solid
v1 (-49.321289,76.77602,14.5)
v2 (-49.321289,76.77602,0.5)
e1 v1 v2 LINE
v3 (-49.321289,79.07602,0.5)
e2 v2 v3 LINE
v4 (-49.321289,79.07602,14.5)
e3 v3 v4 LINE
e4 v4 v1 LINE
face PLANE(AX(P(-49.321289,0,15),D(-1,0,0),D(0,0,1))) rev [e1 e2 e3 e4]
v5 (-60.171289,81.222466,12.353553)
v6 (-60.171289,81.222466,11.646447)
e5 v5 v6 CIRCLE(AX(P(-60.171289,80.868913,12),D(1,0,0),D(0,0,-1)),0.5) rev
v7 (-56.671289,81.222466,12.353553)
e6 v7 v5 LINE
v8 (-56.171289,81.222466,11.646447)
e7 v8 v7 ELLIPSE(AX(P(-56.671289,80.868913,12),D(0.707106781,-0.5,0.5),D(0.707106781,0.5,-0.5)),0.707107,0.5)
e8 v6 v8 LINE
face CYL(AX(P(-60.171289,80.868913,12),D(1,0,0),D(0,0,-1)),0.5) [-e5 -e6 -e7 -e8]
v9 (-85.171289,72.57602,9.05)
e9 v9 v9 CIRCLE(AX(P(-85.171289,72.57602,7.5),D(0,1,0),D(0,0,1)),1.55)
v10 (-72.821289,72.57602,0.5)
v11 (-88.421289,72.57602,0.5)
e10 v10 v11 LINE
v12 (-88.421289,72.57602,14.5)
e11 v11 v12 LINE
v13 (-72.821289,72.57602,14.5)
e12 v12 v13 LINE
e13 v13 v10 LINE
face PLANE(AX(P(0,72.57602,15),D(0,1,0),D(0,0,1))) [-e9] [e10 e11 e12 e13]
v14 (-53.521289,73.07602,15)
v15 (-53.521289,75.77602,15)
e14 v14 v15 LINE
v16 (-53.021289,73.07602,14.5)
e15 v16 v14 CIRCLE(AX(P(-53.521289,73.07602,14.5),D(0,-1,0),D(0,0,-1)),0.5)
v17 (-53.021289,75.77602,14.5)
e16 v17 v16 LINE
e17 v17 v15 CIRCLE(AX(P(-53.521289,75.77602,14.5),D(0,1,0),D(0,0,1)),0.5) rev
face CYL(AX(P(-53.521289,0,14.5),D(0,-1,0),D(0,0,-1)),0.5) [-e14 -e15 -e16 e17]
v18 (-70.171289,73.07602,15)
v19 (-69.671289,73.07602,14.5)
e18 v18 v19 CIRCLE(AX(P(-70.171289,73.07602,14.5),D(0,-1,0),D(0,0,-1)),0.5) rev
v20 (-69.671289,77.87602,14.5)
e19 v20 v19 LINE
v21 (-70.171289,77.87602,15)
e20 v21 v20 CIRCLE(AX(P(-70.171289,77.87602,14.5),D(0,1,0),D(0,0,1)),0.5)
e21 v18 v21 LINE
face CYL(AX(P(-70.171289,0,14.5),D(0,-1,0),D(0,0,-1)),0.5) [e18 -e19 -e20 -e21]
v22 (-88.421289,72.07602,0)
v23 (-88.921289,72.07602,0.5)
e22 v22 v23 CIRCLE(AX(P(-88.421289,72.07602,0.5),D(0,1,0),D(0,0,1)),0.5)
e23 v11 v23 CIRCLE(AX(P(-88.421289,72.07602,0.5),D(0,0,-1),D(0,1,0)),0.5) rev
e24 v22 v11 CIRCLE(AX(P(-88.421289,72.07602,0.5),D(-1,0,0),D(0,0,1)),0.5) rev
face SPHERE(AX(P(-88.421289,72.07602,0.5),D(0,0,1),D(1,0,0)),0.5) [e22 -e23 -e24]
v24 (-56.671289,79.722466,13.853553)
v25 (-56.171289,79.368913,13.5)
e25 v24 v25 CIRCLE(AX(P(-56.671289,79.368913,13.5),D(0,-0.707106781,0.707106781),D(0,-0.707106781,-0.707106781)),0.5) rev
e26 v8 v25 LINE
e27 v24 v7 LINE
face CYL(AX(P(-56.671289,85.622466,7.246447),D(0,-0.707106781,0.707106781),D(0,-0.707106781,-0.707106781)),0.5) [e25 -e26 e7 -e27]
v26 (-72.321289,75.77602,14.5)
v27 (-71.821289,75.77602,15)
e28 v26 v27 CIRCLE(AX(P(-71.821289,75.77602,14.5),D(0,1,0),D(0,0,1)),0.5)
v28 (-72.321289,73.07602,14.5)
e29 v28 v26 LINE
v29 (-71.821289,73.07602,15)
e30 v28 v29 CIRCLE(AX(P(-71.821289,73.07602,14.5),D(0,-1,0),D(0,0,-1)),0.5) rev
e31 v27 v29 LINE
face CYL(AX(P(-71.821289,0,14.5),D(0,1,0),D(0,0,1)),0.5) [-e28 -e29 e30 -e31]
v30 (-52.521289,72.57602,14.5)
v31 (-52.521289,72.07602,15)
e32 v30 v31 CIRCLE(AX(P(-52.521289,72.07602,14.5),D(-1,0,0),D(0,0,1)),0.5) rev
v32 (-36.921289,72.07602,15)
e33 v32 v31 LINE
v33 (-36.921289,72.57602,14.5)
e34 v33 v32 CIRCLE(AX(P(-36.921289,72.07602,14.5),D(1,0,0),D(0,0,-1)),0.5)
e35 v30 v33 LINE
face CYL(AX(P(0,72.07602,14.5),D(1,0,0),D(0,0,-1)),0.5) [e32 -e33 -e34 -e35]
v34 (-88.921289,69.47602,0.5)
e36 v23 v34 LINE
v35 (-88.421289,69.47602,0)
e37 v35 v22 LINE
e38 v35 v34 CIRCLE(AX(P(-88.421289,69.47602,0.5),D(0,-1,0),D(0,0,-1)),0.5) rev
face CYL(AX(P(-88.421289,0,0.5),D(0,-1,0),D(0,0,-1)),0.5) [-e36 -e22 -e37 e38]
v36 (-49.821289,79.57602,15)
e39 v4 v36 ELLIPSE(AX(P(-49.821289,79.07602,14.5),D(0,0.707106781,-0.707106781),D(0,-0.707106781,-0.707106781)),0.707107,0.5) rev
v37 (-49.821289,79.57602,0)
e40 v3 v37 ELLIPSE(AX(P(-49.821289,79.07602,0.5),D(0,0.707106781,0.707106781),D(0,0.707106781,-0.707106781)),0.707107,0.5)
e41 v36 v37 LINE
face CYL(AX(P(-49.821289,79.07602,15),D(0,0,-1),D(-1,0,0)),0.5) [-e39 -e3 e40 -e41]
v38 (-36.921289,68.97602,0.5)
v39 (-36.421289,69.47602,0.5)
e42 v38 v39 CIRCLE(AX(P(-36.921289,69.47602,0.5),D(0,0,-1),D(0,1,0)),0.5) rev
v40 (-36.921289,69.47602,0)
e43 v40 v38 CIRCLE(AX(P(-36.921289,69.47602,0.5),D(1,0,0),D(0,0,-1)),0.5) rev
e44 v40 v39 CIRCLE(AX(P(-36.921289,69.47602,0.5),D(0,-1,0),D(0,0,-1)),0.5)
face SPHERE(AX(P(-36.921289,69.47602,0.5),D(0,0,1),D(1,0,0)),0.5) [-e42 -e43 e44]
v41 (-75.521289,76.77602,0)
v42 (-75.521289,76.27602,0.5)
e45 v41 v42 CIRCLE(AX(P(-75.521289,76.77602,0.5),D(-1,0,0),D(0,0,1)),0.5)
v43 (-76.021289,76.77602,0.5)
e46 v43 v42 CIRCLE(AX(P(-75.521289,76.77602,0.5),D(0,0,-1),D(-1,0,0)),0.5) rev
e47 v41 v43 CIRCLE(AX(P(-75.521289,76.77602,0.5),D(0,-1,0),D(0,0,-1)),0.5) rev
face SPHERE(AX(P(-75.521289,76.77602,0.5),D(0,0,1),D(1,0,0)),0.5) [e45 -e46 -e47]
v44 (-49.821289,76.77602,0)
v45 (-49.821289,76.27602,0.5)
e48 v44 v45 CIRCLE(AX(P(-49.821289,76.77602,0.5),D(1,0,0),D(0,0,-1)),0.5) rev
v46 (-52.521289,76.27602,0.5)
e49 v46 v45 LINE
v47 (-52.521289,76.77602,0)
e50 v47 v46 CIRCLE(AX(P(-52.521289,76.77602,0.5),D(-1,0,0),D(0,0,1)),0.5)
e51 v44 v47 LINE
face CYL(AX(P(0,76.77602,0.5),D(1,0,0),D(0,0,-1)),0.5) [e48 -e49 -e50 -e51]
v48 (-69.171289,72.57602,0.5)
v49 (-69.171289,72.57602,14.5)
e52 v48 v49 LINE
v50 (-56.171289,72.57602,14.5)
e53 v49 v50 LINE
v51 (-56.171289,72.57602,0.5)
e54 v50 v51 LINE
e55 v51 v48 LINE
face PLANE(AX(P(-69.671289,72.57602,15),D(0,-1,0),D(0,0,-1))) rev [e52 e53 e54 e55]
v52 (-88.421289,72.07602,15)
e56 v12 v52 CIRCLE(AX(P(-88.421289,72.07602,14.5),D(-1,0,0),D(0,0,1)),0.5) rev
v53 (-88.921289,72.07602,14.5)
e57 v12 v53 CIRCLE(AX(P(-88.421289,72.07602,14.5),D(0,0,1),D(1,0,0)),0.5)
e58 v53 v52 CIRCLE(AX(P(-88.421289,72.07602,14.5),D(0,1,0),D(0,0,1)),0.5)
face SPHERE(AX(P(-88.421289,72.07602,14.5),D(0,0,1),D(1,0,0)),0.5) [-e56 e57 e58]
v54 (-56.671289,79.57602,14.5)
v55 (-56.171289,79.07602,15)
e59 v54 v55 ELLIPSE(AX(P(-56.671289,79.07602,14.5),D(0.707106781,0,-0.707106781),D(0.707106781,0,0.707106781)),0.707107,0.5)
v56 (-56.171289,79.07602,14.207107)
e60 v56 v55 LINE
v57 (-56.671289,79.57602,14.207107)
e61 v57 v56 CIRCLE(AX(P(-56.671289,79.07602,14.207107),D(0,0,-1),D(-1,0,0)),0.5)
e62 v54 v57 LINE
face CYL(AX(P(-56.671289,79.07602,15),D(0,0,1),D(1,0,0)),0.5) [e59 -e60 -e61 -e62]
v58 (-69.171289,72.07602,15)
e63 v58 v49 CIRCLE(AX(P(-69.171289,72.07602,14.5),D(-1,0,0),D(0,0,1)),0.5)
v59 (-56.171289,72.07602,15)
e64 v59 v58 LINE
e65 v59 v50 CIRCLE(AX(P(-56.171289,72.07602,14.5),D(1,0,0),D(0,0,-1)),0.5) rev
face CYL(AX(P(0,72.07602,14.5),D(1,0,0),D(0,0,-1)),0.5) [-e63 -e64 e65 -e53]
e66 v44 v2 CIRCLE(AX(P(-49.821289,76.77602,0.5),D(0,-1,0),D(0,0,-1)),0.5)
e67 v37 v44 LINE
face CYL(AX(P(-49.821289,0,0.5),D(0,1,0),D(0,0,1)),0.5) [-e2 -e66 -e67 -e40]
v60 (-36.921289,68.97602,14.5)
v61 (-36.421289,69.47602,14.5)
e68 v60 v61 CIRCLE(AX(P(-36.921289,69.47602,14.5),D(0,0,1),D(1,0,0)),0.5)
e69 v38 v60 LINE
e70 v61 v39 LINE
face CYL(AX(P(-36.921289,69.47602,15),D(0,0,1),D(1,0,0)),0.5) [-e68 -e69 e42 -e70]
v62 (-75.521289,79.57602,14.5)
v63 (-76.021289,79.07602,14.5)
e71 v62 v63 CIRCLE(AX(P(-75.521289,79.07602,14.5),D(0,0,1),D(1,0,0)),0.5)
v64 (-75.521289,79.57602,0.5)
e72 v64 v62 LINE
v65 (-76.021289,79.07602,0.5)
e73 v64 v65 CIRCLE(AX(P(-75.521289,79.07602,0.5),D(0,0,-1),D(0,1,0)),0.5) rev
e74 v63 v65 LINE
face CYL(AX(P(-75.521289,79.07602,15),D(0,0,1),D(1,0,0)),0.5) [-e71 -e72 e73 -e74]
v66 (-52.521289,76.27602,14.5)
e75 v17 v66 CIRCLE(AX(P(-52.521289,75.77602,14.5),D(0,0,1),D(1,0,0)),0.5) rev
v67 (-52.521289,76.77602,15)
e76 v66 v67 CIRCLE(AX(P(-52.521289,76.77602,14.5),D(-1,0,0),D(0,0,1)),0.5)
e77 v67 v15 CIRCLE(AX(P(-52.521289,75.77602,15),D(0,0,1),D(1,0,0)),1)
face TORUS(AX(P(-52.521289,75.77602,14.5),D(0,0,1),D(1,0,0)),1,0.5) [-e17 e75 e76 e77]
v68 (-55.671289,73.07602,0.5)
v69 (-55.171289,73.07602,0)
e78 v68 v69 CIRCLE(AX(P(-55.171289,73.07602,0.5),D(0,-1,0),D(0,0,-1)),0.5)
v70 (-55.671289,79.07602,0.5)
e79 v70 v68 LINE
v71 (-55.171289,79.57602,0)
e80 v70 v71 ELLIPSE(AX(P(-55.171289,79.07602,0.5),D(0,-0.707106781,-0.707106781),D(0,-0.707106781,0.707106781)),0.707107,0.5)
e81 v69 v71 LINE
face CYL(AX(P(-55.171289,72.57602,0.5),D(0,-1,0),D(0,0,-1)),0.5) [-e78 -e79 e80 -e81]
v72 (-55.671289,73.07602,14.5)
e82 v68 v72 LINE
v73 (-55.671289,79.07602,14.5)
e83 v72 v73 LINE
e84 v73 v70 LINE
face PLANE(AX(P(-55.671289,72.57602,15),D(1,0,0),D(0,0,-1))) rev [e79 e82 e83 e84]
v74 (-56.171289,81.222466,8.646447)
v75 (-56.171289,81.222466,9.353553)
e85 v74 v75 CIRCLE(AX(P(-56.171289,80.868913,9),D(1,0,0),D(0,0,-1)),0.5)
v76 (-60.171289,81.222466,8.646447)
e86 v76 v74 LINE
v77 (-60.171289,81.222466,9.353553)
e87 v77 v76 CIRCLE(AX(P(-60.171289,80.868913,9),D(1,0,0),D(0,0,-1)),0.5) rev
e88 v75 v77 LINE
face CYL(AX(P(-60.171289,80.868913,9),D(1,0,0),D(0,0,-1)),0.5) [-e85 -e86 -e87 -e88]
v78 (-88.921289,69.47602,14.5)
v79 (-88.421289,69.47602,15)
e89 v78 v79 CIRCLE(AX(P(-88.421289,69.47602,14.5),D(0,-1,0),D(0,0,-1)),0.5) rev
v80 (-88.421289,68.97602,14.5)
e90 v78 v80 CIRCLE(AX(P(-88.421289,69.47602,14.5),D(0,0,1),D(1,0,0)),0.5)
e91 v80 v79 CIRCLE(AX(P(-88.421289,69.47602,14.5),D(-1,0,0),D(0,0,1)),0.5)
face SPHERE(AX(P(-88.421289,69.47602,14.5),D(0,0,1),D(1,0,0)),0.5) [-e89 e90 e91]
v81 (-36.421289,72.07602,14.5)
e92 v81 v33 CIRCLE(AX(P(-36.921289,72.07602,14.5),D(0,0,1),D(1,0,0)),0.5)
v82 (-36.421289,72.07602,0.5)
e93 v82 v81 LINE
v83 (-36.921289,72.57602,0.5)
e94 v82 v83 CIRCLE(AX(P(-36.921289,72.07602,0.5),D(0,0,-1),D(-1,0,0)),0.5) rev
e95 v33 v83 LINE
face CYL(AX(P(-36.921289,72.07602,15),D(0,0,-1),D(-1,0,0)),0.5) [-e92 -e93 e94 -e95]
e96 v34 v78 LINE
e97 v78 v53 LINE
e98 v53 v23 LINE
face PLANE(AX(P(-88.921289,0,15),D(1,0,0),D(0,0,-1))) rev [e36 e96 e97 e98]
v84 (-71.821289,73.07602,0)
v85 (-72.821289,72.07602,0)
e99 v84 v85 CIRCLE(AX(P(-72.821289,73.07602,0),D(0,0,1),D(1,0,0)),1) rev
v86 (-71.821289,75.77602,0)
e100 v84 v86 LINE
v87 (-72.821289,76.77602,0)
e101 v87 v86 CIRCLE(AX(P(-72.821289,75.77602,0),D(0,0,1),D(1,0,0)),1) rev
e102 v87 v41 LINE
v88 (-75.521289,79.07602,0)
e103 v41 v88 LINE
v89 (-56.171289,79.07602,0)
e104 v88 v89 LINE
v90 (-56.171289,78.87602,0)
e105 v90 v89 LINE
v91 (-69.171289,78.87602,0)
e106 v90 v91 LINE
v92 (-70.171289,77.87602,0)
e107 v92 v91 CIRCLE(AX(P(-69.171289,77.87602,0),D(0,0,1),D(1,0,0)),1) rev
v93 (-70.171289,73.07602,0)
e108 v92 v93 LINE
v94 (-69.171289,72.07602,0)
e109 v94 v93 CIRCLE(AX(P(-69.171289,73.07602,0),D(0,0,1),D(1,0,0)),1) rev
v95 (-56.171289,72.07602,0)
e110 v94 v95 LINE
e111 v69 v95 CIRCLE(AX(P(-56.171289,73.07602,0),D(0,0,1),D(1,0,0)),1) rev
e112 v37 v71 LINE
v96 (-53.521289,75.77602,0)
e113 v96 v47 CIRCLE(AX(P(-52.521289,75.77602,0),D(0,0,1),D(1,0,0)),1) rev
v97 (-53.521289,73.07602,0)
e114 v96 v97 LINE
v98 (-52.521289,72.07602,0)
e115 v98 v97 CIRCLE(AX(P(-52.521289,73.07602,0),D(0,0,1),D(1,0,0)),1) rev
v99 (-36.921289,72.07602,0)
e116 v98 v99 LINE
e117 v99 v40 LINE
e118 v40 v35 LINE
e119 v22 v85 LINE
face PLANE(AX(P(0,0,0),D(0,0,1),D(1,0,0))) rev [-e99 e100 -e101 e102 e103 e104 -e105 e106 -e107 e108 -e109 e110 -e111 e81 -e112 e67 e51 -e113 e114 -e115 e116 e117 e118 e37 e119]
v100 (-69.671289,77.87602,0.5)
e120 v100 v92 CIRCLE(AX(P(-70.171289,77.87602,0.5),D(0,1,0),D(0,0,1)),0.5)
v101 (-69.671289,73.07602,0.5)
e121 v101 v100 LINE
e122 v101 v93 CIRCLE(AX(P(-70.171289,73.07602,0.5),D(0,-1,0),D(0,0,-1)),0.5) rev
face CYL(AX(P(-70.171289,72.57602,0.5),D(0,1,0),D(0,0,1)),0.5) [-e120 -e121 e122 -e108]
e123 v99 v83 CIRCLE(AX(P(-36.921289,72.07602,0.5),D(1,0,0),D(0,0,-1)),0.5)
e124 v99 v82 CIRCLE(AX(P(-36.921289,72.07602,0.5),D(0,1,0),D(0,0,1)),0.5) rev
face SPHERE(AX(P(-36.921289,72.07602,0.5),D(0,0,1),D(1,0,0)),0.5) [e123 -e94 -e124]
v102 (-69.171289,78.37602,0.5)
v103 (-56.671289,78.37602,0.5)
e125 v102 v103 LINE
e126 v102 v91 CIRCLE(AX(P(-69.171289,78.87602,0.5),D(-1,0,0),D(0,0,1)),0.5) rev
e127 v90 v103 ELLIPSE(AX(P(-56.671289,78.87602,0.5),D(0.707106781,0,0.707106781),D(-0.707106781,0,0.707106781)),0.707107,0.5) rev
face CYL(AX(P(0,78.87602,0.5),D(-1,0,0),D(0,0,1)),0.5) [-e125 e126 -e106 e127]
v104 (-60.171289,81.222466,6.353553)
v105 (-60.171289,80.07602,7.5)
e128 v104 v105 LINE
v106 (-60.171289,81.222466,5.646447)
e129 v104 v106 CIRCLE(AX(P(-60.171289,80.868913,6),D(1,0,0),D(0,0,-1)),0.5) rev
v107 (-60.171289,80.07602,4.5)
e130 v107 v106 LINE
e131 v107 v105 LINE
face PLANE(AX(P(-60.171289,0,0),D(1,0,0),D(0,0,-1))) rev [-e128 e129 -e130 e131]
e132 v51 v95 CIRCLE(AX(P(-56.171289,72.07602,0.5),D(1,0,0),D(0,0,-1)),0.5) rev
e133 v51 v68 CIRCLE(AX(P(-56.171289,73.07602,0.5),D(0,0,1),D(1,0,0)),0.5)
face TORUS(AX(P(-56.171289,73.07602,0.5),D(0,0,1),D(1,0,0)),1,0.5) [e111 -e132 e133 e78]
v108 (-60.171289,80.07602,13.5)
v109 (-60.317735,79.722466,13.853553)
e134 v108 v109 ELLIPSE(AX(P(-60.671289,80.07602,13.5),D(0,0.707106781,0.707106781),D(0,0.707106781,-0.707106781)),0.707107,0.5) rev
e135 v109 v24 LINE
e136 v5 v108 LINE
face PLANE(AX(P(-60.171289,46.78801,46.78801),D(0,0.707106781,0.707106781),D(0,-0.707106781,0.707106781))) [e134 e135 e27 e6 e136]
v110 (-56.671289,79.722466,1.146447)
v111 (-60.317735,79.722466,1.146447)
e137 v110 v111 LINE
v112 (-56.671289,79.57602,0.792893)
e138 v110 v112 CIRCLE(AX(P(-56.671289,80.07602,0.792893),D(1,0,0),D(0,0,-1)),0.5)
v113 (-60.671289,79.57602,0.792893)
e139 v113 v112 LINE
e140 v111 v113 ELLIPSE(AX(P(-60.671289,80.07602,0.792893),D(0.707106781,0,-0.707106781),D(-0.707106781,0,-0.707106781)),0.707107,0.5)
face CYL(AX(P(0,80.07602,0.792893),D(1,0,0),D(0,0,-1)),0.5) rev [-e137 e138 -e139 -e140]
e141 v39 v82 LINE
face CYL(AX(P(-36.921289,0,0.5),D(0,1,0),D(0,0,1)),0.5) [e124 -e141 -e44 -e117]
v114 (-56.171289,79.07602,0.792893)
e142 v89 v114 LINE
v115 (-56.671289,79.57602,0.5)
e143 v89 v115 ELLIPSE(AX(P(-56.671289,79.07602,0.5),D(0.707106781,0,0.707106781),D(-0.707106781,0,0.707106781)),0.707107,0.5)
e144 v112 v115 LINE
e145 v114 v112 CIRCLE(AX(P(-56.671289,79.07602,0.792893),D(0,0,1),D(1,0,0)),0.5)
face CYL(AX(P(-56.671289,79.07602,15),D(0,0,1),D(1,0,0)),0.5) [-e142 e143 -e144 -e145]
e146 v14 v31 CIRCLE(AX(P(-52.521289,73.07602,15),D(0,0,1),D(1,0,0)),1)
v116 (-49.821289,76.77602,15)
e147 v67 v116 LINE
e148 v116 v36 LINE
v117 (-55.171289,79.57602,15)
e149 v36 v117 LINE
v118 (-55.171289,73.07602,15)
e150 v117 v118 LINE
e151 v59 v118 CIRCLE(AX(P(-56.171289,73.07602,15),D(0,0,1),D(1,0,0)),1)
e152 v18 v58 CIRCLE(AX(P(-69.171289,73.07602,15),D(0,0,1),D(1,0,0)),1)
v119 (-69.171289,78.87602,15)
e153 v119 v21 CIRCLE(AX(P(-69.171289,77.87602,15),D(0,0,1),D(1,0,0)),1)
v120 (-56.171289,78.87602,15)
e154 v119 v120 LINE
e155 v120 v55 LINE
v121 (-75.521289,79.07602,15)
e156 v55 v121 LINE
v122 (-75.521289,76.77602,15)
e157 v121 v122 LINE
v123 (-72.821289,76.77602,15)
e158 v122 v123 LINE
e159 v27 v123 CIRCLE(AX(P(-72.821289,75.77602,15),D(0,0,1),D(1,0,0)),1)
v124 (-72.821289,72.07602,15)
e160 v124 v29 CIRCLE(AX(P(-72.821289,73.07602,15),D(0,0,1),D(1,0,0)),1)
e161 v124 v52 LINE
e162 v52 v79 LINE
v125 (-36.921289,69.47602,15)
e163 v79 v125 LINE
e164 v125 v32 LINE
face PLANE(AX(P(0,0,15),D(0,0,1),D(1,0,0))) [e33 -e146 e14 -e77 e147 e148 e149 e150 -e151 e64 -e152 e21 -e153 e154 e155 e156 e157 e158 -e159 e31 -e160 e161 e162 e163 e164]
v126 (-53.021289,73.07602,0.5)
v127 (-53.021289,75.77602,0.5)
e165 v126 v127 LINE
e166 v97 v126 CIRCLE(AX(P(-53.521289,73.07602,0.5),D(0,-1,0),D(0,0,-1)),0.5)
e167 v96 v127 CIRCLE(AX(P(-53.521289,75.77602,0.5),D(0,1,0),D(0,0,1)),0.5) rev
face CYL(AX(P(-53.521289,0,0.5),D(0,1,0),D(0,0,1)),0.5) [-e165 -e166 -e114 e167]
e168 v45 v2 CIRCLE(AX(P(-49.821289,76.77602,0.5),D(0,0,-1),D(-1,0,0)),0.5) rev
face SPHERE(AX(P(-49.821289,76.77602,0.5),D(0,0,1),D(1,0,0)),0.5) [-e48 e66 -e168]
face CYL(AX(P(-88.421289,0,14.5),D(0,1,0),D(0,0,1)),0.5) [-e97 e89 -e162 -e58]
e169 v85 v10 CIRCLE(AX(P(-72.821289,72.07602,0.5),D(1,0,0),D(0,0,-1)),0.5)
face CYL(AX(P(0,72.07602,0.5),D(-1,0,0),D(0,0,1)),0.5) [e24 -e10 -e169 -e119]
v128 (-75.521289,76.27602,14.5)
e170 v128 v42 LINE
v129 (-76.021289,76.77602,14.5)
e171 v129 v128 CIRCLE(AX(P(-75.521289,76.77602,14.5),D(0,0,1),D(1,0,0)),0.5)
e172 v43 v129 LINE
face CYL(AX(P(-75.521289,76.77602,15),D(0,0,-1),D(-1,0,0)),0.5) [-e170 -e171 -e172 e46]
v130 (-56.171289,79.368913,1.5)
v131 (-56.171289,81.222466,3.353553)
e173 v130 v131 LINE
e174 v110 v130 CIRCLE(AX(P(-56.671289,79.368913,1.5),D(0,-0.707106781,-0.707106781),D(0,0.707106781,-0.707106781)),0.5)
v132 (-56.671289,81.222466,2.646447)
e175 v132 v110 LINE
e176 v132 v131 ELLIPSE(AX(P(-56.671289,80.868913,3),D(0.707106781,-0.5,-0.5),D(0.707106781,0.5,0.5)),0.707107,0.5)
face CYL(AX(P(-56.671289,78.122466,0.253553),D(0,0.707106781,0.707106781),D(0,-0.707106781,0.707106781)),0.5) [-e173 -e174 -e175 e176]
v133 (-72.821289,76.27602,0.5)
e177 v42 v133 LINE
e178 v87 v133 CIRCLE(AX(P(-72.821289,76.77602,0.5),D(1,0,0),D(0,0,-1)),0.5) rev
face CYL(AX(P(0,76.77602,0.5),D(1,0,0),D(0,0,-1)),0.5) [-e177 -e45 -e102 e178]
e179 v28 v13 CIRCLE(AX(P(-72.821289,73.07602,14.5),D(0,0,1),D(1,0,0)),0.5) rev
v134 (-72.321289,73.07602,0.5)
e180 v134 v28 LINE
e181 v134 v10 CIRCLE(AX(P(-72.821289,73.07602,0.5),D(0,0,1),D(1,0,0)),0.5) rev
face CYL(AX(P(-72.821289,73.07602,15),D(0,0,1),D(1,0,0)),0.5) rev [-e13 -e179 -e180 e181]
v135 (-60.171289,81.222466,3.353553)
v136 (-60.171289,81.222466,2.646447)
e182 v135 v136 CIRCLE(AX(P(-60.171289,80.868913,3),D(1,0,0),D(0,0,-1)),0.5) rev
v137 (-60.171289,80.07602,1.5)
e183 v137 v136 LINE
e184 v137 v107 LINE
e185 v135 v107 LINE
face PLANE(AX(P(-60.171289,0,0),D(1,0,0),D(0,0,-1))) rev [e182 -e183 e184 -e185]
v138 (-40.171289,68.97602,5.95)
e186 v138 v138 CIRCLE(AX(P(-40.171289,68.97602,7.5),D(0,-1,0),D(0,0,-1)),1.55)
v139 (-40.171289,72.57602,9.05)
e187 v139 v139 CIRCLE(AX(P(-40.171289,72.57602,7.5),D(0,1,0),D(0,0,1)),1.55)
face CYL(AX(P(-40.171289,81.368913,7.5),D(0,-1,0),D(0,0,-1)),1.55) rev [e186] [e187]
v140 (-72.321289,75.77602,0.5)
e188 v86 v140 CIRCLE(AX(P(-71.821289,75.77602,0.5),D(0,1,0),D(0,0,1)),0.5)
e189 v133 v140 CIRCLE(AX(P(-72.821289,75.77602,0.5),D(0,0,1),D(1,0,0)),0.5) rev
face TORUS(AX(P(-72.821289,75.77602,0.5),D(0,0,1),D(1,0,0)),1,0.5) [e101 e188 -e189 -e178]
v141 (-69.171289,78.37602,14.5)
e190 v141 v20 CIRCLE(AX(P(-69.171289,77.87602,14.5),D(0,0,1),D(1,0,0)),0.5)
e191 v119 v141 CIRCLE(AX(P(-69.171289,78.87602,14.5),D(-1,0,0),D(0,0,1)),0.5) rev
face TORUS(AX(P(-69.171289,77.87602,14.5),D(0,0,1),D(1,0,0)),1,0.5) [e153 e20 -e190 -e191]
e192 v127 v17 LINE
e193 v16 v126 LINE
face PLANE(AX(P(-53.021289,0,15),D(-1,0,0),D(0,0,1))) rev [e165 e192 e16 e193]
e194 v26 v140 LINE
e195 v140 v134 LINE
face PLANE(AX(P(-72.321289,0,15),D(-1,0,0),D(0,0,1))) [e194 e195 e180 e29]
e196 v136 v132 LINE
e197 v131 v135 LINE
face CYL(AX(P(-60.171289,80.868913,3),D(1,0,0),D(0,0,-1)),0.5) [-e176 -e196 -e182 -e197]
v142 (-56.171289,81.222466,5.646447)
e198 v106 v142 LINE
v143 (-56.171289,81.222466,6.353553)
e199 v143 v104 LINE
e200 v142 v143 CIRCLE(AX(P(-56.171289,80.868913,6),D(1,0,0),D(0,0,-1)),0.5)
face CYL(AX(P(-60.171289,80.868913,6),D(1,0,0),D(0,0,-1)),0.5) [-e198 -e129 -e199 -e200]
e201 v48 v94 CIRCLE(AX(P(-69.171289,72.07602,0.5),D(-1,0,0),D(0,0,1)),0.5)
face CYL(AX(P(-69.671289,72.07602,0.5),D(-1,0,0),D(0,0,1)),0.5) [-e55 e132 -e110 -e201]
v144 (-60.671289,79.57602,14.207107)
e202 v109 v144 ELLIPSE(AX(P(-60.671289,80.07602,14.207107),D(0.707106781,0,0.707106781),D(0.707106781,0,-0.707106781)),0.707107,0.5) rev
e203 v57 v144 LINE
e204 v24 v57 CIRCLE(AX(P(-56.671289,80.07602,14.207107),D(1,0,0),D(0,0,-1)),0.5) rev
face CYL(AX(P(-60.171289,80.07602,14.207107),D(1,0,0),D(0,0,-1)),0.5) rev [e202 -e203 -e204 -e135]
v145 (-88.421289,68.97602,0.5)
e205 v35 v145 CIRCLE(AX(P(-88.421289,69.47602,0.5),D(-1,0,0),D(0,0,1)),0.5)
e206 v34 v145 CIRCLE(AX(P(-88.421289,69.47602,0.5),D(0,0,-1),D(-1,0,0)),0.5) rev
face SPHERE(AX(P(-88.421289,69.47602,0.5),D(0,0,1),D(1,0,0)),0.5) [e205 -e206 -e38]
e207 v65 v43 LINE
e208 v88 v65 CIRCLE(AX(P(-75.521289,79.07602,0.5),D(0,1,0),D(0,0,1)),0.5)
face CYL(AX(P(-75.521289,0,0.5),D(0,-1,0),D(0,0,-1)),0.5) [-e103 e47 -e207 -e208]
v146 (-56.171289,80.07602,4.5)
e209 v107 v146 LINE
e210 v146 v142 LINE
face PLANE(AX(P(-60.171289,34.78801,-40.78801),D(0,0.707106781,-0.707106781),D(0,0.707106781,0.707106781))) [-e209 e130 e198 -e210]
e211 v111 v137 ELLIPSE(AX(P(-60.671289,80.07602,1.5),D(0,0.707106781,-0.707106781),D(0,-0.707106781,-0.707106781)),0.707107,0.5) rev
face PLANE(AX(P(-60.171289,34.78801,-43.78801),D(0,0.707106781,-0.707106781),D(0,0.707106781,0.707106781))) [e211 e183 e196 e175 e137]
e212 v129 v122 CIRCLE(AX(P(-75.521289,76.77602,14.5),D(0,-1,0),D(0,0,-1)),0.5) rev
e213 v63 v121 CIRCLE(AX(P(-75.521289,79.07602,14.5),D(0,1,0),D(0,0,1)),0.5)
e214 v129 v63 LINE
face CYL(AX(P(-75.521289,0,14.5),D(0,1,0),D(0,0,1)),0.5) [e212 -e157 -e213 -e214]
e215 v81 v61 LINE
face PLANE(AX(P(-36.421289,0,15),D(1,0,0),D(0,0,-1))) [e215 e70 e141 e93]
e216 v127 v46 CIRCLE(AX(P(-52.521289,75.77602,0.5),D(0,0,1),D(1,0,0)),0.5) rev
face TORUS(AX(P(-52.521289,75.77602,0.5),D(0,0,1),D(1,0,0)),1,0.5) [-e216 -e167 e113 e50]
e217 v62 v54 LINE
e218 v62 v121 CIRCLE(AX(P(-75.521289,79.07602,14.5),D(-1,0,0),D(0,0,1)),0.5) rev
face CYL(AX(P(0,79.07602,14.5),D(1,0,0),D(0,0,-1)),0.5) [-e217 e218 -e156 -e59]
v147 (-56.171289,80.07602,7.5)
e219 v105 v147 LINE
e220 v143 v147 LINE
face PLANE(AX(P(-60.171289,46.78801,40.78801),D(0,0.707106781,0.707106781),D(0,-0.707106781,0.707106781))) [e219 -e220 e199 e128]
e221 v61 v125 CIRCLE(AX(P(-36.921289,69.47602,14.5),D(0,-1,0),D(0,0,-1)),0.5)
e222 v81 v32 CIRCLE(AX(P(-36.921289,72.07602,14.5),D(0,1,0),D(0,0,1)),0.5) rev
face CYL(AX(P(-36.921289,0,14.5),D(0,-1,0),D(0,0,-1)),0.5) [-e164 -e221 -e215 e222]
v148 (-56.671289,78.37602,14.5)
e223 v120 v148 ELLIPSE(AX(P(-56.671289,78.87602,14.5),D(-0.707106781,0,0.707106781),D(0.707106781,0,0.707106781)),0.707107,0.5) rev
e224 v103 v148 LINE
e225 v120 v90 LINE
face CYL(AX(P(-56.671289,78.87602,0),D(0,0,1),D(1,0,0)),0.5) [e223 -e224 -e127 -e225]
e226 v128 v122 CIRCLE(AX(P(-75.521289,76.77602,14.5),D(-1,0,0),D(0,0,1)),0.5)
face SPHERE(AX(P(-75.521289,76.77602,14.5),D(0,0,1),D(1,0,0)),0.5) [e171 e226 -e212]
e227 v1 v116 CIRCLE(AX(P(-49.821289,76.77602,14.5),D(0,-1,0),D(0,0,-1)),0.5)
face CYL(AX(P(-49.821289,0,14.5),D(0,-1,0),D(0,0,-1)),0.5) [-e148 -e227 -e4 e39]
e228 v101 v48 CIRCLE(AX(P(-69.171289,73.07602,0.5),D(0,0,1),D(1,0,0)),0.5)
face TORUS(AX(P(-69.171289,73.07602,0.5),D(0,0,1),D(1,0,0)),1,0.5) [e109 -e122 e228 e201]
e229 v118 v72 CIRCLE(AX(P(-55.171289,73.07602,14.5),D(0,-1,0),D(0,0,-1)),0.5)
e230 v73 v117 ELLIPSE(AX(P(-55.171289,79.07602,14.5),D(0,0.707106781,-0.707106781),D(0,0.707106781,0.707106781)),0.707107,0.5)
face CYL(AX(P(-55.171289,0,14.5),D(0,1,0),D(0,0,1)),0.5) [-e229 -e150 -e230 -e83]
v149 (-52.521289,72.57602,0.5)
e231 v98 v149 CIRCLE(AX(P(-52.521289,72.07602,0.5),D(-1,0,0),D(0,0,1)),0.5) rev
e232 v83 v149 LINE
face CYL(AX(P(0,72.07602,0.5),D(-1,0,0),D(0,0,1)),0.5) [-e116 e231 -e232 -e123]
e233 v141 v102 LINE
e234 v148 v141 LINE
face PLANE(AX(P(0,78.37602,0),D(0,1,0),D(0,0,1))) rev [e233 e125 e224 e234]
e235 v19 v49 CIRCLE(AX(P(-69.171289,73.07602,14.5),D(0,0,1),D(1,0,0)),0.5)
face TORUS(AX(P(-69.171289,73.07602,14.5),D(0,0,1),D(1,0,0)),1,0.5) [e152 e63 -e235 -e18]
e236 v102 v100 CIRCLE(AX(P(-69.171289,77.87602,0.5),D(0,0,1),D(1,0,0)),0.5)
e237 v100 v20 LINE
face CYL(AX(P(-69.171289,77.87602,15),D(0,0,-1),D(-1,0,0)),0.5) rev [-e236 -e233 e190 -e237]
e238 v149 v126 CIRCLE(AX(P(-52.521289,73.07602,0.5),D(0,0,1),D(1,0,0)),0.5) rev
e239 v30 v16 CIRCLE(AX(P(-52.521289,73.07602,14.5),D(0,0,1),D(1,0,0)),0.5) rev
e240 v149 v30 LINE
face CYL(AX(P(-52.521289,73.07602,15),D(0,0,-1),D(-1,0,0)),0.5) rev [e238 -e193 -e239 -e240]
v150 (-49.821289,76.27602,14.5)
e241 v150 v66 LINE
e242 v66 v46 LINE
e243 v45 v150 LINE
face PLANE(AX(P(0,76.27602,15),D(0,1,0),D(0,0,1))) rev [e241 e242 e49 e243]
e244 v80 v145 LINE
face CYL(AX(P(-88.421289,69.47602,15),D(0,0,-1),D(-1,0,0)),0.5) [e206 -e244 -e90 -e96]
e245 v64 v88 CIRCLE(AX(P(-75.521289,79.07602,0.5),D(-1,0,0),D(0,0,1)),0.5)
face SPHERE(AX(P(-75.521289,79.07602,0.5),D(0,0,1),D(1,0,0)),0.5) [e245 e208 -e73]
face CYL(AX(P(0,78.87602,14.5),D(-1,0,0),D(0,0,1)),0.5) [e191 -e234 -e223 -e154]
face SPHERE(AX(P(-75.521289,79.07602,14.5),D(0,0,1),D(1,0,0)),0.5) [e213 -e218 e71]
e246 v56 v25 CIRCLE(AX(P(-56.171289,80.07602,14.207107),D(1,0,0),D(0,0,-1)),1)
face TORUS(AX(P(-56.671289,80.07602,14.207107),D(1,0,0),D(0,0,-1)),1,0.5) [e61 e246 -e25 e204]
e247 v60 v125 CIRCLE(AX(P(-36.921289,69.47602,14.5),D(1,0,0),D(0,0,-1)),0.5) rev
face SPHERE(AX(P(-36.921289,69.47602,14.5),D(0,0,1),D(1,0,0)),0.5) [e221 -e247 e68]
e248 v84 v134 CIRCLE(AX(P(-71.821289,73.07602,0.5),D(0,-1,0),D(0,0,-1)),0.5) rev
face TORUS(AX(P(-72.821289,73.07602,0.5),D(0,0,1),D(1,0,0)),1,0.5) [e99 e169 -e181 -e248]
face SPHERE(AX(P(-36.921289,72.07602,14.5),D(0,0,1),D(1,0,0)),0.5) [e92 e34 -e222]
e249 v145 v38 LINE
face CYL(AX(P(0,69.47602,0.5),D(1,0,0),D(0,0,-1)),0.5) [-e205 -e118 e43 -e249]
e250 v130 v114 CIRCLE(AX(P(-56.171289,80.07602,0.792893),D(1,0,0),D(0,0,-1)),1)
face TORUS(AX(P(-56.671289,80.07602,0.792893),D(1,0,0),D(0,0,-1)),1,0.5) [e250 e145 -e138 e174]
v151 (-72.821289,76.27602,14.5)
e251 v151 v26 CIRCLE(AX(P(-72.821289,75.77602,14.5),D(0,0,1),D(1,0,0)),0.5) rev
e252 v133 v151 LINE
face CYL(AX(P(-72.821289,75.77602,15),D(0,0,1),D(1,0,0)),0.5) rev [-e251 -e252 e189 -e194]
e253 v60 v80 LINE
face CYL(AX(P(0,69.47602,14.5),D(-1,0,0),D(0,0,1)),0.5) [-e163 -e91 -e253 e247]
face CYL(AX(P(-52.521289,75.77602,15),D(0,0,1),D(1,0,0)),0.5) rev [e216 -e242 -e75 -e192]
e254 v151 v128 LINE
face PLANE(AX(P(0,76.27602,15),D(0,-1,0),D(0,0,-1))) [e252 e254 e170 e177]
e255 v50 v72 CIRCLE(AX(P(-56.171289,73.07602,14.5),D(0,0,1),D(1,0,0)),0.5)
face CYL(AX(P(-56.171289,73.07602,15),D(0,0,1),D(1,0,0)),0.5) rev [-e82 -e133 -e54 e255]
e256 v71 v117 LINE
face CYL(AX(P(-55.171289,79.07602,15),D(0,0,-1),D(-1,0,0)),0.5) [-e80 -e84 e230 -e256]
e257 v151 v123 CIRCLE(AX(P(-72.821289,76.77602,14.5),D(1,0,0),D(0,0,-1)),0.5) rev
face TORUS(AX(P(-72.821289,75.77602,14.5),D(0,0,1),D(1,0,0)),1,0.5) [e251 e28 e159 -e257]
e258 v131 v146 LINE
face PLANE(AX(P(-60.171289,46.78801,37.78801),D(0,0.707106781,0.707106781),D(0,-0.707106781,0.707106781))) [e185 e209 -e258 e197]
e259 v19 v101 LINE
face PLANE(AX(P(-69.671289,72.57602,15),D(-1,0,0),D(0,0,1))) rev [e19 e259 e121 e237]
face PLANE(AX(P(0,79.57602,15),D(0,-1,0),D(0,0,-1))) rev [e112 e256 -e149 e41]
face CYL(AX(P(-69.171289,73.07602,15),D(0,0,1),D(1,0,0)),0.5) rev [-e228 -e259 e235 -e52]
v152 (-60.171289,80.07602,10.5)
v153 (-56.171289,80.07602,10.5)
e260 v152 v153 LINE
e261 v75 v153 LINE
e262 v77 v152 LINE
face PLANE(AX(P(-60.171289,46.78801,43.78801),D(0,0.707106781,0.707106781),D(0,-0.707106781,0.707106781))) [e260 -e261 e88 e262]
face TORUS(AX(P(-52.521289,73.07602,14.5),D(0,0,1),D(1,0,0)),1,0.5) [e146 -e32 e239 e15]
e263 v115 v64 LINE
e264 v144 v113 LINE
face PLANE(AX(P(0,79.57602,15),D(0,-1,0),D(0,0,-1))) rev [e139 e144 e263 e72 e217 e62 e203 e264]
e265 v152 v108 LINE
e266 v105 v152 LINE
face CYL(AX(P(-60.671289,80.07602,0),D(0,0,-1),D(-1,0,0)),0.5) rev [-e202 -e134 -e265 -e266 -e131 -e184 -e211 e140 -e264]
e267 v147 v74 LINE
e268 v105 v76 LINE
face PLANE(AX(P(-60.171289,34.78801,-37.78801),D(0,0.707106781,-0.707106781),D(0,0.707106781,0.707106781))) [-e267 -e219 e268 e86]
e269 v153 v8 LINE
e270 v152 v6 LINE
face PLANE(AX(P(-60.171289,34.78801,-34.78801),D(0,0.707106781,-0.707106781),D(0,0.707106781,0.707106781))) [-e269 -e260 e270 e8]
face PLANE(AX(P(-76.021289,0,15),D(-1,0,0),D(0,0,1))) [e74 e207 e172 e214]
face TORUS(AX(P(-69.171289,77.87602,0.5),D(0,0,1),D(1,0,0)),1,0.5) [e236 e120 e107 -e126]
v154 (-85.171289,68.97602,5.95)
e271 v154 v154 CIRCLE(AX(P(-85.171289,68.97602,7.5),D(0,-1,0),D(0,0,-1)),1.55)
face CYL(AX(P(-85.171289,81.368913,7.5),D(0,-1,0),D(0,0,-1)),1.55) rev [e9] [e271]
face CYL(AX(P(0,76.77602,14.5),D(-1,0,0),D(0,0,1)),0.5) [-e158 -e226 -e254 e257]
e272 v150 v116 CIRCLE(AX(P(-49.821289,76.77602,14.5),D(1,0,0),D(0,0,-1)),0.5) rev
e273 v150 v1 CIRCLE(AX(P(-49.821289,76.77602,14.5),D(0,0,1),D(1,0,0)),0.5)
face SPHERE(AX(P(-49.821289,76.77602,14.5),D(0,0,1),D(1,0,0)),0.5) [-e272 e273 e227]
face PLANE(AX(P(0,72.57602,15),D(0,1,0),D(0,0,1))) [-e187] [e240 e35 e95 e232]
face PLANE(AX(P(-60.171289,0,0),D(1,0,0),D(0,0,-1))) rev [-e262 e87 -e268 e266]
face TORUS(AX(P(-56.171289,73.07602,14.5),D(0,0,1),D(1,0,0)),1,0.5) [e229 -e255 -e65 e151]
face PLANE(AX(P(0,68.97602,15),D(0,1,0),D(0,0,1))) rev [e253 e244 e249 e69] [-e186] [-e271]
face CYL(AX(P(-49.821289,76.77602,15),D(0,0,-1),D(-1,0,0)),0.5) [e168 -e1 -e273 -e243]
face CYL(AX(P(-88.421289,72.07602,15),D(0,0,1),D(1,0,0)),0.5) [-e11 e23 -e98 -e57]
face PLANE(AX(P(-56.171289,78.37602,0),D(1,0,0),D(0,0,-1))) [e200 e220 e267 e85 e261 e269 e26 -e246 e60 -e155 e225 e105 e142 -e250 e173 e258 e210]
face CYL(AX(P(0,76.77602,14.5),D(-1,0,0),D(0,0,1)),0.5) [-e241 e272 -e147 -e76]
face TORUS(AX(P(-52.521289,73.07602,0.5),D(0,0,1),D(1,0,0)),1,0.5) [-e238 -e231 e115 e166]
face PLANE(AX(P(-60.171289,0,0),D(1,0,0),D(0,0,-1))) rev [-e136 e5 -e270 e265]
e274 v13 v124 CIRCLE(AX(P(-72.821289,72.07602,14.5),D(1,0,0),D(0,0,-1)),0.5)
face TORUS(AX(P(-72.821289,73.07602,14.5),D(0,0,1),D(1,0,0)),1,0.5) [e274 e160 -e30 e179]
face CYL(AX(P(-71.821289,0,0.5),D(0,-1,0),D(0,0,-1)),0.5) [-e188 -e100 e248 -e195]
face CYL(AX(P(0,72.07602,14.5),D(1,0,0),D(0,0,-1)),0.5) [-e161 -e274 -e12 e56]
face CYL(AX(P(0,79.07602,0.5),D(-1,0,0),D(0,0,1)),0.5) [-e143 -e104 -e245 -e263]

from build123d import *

# Parameters (mm, degrees)
BOSS_EXTRUDE1_DEPTH = 15
SKETCH4_W           = 14
SKETCH4_H           = 7
CUT_EXTRUDE1_DEPTH  = 121.267778243
SKETCH5_W           = 13.5
SKETCH5_H           = 15
BOSS_EXTRUDE2_DEPTH = 1.2
SKETCH6_W           = 3
SKETCH6_H           = 0.5
BOSS_EXTRUDE3_DEPTH = 4
LPATTERN1_COUNT     = 4
LPATTERN1_PITCH     = 3
BOSS_EXTRUDE4_DEPTH = 4
FILLET1_R           = 0.5
SKETCH8_R           = 1.55
CUT_EXTRUDE2_DEPTH  = 92.025163668


with BuildPart() as part:
    # Sketch2 → Boss-Extrude1 (new body)
    with BuildSketch(Plane.XY):
        Polygon((-72.321288744, 76.276019576), (-72.321288744, 72.576019576), (-62.671288744, 72.576019576), (-53.021288744, 72.576019576), (-53.021288744, 76.276019576), (-49.321288744, 76.276019576), (-49.321288744, 79.576019576), (-76.021288744, 79.576019576), (-76.021288744, 76.276019576), align=None)
        Polygon((-62.671288744, 72.576019576), (-62.671288744, 68.976019576), (-36.421288744, 68.976019576), (-36.421288744, 72.576019576), (-53.021288744, 72.576019576), align=None)
        Polygon((-72.321288744, 72.576019576), (-88.921288744, 72.576019576), (-88.921288744, 68.976019576), (-62.671288744, 68.976019576), (-62.671288744, 72.576019576), align=None)
    extrude(amount=BOSS_EXTRUDE1_DEPTH)

    # Sketch4 → Cut-Extrude1 (cut, through all)
    with BuildSketch(Plane(origin=(0, 0, 0), x_dir=(-1, 0, 0), z_dir=(0, 0, -1))):
        with Locations((62.671288744, 76.076019576)):
            Rectangle(SKETCH4_W, SKETCH4_H)
    extrude(amount=-CUT_EXTRUDE1_DEPTH, mode=Mode.SUBTRACT)

    # Sketch5 → Boss-Extrude2 (add)
    with BuildSketch(Plane(origin=(0, 79.576019576, 0), x_dir=(1, 0, 0), z_dir=(0, 1, 0))):
        with Locations((-62.921288744, -7.5)):
            Rectangle(SKETCH5_W, SKETCH5_H)
    extrude(amount=-BOSS_EXTRUDE2_DEPTH)

    # Sketch6 → Boss-Extrude3 (add)
    with BuildSketch(Plane(origin=(-56.171288744, 0, 0), x_dir=(0, 0, -1), z_dir=(1, 0, 0))):
        with Locations((-12, 79.826019576)):
            Rectangle(SKETCH6_W, SKETCH6_H)
        Polygon((-10.5, 80.076019576), (-13.5, 80.076019576), (-12, 81.576019576), align=None)
    boss_extrude3 = extrude(amount=-BOSS_EXTRUDE3_DEPTH)

    # LPattern1: Boss-Extrude3 ×4
    with Locations(*[(0, 0, -i * LPATTERN1_PITCH) for i in range(1, LPATTERN1_COUNT)]):
        add(boss_extrude3)

    # Sketch7 → Boss-Extrude4 (add)
    with BuildSketch(Plane(origin=(-56.171288744, 0, 0), x_dir=(0, 0, -1), z_dir=(1, 0, 0))):
        Polygon((-13.5, 80.076019576), (-13.5, 79.576019576), (-14, 79.576019576), align=None)
        Polygon((-1.5, 80.076019576), (-1.5, 79.576019576), (-1, 79.576019576), align=None)
    extrude(amount=-BOSS_EXTRUDE4_DEPTH)

    # Fillet1
    fillet1_edges = [part.edges().sort_by_distance(p)[0] for p in [
        (-72.321288744, 76.276019576, 7.5),
        (-72.321288744, 72.576019576, 7.5),
        (-72.321288744, 74.426019576, 0),
        (-72.321288744, 74.426019576, 15),
        (-74.171288744, 76.276019576, 15),
        (-80.621288744, 72.576019576, 15),
        (-88.921288744, 70.776019576, 15),
        (-62.671288744, 68.976019576, 15),
        (-36.421288744, 70.776019576, 15),
        (-44.721288744, 72.576019576, 15),
        (-53.021288744, 74.426019576, 15),
        (-51.171288744, 76.276019576, 15),
        (-49.321288744, 77.926019576, 15),
        (-55.671288744, 76.076019576, 15),
        (-62.671288744, 72.576019576, 15),
        (-69.671288744, 75.476019576, 15),
        (-62.921288744, 78.376019576, 15),
        (-66.096288744, 79.576019576, 15),
        (-76.021288744, 77.926019576, 15),
        (-76.021288744, 79.576019576, 7.5),
        (-76.021288744, 76.276019576, 7.5),
        (-76.021288744, 77.926019576, 0),
        (-66.096288744, 79.576019576, 0),
        (-56.171288744, 79.576019576, 0.5),
        (-58.171288744, 79.576019576, 1),
        (-60.171288744, 79.576019576, 7.5),
        (-58.171288744, 79.576019576, 14),
        (-56.171288744, 79.576019576, 14.5),
        (-58.171288744, 81.576019576, 12),
        (-56.171288744, 80.576019576, 13),
        (-58.171288744, 81.576019576, 9),
        (-58.171288744, 81.576019576, 6),
        (-58.171288744, 81.576019576, 3),
        (-56.171288744, 80.576019576, 2),
        (-56.171288744, 78.376019576, 7.5),
        (-62.921288744, 78.376019576, 0),
        (-69.671288744, 78.376019576, 7.5),
        (-69.671288744, 75.476019576, 0),
        (-69.671288744, 72.576019576, 7.5),
        (-62.671288744, 72.576019576, 0),
        (-55.671288744, 72.576019576, 7.5),
        (-55.671288744, 76.076019576, 0),
        (-55.671288744, 79.576019576, 7.5),
        (-49.321288744, 79.576019576, 7.5),
        (-49.321288744, 76.276019576, 7.5),
        (-49.321288744, 77.926019576, 0),
        (-53.021288744, 76.276019576, 7.5),
        (-51.171288744, 76.276019576, 0),
        (-53.021288744, 72.576019576, 7.5),
        (-53.021288744, 74.426019576, 0),
        (-44.721288744, 72.576019576, 0),
        (-36.421288744, 72.576019576, 7.5),
        (-36.421288744, 68.976019576, 7.5),
        (-36.421288744, 70.776019576, 0),
        (-62.671288744, 68.976019576, 0),
        (-88.921288744, 68.976019576, 7.5),
        (-88.921288744, 72.576019576, 7.5),
        (-88.921288744, 70.776019576, 0),
        (-74.171288744, 76.276019576, 0),
        (-80.621288744, 72.576019576, 0),
    ]]
    fillet(fillet1_edges, radius=FILLET1_R - 0.0001)  # a hair under: the kernel refuses the full size

    # Sketch8 → Cut-Extrude2 (cut, through all)
    with BuildSketch(Plane.XZ.offset(-68.976019576)):
        with Locations(Location((-85.171288744, 7.5, 0), (0, 0, 270))):
            Circle(SKETCH8_R)
        with Locations(Location((-40.171288744, 7.5, 0), (0, 0, 270))):
            Circle(SKETCH8_R)
    extrude(amount=-CUT_EXTRUDE2_DEPTH, mode=Mode.SUBTRACT)


solid = part.part
